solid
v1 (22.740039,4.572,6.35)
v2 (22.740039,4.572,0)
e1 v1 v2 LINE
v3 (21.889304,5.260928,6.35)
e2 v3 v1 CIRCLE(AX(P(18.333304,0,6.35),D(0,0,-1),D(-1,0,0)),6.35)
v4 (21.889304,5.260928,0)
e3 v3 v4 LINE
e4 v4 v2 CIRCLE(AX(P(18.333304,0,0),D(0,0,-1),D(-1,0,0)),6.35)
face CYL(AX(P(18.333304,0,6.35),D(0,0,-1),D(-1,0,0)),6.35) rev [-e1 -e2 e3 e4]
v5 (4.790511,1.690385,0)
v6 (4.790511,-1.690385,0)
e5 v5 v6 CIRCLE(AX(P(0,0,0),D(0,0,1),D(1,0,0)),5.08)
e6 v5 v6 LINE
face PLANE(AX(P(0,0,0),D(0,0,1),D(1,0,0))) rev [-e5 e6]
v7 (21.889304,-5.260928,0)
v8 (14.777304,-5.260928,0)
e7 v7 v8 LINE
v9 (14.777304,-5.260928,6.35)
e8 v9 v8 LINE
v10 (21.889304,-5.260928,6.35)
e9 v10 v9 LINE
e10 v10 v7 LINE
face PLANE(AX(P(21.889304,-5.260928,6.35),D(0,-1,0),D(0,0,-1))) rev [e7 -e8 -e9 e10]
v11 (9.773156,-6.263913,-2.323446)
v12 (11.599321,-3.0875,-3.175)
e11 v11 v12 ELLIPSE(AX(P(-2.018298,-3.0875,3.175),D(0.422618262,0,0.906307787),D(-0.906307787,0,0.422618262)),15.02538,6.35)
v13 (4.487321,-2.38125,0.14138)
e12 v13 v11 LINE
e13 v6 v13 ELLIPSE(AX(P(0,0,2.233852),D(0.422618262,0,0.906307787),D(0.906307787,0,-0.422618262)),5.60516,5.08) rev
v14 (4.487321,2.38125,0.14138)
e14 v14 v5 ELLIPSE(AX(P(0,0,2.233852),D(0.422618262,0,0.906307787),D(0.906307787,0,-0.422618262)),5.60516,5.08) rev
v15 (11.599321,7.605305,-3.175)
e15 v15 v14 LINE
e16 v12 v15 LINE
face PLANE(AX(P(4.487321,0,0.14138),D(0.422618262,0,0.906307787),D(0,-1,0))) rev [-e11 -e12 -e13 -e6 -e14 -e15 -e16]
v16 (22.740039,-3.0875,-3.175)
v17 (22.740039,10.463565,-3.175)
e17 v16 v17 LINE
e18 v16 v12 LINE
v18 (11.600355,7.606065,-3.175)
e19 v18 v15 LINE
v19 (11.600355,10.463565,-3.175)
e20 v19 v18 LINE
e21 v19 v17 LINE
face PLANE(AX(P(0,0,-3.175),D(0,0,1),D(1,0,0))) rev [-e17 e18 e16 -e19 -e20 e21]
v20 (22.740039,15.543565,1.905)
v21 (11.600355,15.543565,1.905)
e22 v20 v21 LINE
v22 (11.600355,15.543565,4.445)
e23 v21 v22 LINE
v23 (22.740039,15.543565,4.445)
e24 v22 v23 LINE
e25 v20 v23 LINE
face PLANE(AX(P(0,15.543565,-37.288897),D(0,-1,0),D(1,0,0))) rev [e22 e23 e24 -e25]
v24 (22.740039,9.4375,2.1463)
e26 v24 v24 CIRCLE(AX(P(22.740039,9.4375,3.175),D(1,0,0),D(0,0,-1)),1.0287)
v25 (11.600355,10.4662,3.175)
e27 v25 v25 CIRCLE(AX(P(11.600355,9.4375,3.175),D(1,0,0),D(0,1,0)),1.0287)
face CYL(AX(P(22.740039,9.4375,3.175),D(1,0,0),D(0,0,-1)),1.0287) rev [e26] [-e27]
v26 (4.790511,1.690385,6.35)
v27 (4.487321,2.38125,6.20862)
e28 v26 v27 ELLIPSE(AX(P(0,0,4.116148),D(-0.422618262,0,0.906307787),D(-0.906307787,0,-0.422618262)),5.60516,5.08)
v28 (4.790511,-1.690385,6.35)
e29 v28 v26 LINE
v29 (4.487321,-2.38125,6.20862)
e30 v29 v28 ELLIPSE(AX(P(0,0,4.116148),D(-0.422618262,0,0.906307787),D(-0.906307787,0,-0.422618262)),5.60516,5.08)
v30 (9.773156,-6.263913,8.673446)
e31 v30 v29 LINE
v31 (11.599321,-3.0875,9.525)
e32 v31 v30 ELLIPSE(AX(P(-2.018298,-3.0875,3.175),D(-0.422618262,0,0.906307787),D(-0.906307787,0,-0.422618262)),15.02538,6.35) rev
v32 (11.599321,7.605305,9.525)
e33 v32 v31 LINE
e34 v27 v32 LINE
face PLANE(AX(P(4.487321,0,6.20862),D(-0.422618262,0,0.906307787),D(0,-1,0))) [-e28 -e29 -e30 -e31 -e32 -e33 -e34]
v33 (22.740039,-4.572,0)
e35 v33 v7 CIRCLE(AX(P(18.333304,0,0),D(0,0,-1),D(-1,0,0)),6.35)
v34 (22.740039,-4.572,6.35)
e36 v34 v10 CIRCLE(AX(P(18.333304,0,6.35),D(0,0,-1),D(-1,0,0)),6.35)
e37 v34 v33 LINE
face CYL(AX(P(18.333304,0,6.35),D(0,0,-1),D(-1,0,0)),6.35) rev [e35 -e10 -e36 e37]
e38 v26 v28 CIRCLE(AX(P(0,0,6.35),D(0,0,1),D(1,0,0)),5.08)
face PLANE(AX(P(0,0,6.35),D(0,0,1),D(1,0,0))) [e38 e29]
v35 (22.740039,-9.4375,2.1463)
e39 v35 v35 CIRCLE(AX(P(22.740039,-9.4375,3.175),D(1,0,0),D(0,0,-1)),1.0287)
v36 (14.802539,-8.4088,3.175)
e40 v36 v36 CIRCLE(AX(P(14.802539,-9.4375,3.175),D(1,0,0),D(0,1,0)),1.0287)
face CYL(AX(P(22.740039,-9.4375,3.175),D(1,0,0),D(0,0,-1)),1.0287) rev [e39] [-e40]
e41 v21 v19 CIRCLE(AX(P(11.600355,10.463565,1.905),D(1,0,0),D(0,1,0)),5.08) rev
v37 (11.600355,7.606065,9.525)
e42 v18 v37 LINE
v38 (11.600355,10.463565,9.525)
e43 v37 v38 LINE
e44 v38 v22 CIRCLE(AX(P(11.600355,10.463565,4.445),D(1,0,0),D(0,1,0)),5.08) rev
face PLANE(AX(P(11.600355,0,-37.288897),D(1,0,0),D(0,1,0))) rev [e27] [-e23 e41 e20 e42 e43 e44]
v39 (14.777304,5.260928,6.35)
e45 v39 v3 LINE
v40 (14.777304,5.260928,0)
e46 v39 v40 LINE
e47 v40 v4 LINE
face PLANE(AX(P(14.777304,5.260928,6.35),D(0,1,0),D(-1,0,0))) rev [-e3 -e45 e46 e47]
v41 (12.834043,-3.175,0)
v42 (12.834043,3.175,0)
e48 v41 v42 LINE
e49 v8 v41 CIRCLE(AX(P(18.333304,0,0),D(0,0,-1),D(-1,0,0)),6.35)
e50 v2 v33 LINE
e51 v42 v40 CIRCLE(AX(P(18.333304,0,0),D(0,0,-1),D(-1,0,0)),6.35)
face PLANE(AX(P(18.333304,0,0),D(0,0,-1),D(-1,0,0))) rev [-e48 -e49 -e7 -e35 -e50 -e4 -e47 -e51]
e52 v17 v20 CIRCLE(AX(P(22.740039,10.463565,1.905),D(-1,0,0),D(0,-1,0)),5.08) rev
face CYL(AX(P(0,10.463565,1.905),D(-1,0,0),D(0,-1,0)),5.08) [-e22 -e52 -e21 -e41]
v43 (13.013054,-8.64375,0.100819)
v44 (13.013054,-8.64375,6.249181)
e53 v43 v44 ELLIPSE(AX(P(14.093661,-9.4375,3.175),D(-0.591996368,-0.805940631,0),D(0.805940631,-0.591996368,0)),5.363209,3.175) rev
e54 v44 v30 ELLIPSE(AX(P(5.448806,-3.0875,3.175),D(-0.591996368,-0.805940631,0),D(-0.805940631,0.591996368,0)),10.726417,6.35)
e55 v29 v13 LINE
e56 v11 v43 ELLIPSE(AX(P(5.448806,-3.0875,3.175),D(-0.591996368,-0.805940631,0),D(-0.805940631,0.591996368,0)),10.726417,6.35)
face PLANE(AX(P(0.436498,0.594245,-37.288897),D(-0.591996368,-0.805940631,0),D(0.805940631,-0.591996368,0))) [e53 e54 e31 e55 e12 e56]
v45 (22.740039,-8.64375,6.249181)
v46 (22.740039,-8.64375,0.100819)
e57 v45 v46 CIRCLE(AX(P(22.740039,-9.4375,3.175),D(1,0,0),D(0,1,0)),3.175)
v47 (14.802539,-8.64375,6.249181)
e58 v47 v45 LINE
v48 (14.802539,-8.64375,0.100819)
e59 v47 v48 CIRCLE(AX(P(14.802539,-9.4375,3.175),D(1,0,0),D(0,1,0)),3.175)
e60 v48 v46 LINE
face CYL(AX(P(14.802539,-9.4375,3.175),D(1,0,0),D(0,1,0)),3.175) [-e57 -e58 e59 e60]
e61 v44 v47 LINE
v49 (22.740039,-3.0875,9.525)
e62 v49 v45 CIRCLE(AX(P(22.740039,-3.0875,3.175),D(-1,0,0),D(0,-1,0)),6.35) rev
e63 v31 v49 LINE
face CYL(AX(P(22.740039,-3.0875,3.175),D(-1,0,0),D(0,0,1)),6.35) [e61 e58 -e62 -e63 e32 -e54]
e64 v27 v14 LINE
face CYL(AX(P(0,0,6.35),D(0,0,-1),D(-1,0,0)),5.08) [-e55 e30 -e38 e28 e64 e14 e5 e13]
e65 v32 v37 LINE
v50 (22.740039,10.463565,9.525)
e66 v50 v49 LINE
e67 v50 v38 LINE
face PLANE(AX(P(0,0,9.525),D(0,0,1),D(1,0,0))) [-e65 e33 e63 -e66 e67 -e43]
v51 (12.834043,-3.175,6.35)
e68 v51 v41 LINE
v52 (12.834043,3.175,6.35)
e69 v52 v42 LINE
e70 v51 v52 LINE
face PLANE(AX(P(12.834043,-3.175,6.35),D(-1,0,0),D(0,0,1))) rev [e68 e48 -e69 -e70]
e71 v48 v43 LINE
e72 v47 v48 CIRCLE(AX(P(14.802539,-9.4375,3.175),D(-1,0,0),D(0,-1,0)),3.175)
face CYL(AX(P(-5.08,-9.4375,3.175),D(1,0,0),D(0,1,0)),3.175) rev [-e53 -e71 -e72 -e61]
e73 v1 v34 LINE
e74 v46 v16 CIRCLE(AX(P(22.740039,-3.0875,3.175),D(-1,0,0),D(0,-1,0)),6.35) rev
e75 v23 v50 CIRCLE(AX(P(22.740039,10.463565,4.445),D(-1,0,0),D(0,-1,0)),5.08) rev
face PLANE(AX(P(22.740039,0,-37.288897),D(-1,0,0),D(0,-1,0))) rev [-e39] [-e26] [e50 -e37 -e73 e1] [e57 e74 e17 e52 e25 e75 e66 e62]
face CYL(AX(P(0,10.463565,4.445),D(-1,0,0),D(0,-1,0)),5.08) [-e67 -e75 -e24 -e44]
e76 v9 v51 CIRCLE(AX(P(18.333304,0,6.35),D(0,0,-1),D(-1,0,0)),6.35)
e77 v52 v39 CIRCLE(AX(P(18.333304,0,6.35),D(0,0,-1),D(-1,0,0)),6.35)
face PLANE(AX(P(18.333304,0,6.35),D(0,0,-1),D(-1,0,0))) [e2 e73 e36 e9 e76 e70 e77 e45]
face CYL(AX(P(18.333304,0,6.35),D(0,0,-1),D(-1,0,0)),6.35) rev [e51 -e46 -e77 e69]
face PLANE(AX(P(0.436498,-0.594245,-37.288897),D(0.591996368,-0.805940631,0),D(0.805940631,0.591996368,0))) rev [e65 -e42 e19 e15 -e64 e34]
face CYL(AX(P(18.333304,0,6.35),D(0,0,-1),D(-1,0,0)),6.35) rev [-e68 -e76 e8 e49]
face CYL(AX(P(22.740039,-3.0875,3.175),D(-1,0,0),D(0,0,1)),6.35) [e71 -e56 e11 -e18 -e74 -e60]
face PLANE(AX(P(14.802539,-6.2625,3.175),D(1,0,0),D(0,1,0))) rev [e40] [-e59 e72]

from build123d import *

# Parameters (mm, degrees)
BOSS_EXTRUDE1_DEPTH   = 6.35
BOSS_EXTRUDE2_START   = 3.175
BOSS_EXTRUDE2_DEPTH   = 12.7
CUT_EXTRUDE1_START    = -3.175
CUT_EXTRUDE1_DEPTH    = 6.35
F_1_CLEARANCE_HOLE1_D = 2.0574
FILLET4_START         = 4.487320853
FILLET4_DEPTH         = 18.252718486
FILLET5_R             = 5.08
CHAMFER3_SIZE         = 7.112
CHAMFER3_SIZE_2       = 3.316380065
BOSS_EXTRUDE3_START   = -7.9375
BOSS_EXTRUDE3_DEPTH   = 7.9375
F_1_CLEARANCE_HOLE2_D = 2.0574
SKETCH14_R            = 3.175
CUT_EXTRUDE2_DEPTH    = 27.974866065


with BuildPart() as part:
    # Sketch1 → Boss-Extrude1 (new body)
    with BuildSketch(Plane.XY):
        with BuildLine():
            Line((4.487320853, -2.38125), (4.487320853, 2.38125))
            ThreePointArc((4.487320853, 2.38125), (-5.08, 0), (4.487320853, -2.38125))
        make_face()
    extrude(amount=BOSS_EXTRUDE1_DEPTH)

    # Sketch2 → Boss-Extrude2 (add)
    with BuildSketch(Plane.XY.offset(6.35).offset(BOSS_EXTRUDE2_START)):
        Polygon((4.487320853, 2.38125), (4.487320853, -2.38125), (11.60035513, -7.606064703), (14.093661168, -9.4375), (22.740039339, -9.4375), (22.740039339, -7.631102389), (22.740039339, 7.631102389), (22.740039339, 15.543564703), (11.60035513, 15.543564703), (11.60035513, 7.606064703), align=None)
    extrude(amount=-BOSS_EXTRUDE2_DEPTH)

    # Sketch10 → Cut-Extrude1 (cut)
    with BuildSketch(Plane(origin=(0, 0, -3.175), x_dir=(-1, 0, 0), z_dir=(0, 0, -1)).offset(CUT_EXTRUDE1_START)):
        with BuildLine():
            Line((-22.740039339, -4.572), (-22.740039339, 4.572))
            ThreePointArc((-22.740039339, 4.572), (-22.329545252, 4.934830916), (-21.88930404, 5.260928055))
            Line((-21.88930404, 5.260928055), (-14.77730404, 5.260928055))
            ThreePointArc((-14.77730404, 5.260928055), (-13.687099855, 4.328427737), (-12.834042726, 3.175))
            Line((-12.834042726, 3.175), (-12.834042726, -3.175))
            ThreePointArc((-12.834042726, -3.175), (-13.687099855, -4.328427737), (-14.77730404, -5.260928055))
            Line((-14.77730404, -5.260928055), (-21.88930404, -5.260928055))
            ThreePointArc((-21.88930404, -5.260928055), (-22.329545252, -4.934830916), (-22.740039339, -4.572))
        make_face()
    extrude(amount=-CUT_EXTRUDE1_DEPTH, mode=Mode.SUBTRACT)

    # #1 Clearance Hole1 (through all)
    with Locations(Plane(origin=(22.740039339, 0, 0), x_dir=(0, 0, -1), z_dir=(1, 0, 0))):
        with Locations((-3.175, 9.4375)):
            Hole(F_1_CLEARANCE_HOLE1_D / 2)

    # Fillet4: read off the stored shape, not the designer's step
    # Fillet4 outline → Fillet4 (cut)
    with BuildSketch(Plane.YZ.offset(FILLET4_START)):
        with BuildLine():
            Line((-9.4375, -3.175), (-3.0875, -3.175))
            ThreePointArc((-3.0875, -3.175), (-7.577628061, -1.315128061), (-9.4375, 3.175))
            Line((-9.4375, 3.175), (-9.4375, -3.175))
        make_face()
        with BuildLine():
            Line((-9.4375, 9.525), (-9.4375, 3.175))
            ThreePointArc((-9.4375, 3.175), (-7.577628061, 7.665128061), (-3.0875, 9.525))
            Line((-3.0875, 9.525), (-9.4375, 9.525))
        make_face()
    extrude(amount=FILLET4_DEPTH, mode=Mode.SUBTRACT)

    # Fillet5
    fillet5_edges = [part.edges().sort_by_distance(p)[0] for p in [
        (17.170197235, 15.543564703, -3.175),
        (17.170197235, 15.543564703, 9.525),
    ]]
    fillet(fillet5_edges, radius=FILLET5_R)

    # Chamfer3
    # the kernel refuses this chamfer: 7.112, 3.316380065 mm, written as the material it takes off along each edge
    with BuildSketch(Plane(origin=(4.487320853, 20.808267553, -3.175), x_dir=(1, 0, 0), z_dir=(0, -1, 0))) as chamfer3_piece_1_section:
        Polygon((CHAMFER3_SIZE, 0), (0, CHAMFER3_SIZE_2), (0, 0), align=None)
    chamfer3_piece_1 = extrude(amount=41.616535106, mode=Mode.PRIVATE)
    chamfer3_piece_1 = chamfer3_piece_1 - Plane(origin=(0, 0, -3.175), x_dir=(0.8833308765689106, 0.46875000000000017, 0), z_dir=(0, 0, -1)) * Cylinder(5.08, 112, mode=Mode.PRIVATE)
    add(chamfer3_piece_1, mode=Mode.SUBTRACT)
    with BuildSketch(Plane(origin=(4.487320853, 20.808267553, -3.175), x_dir=(1, 0, 0), z_dir=(0, -1, 0))) as chamfer3_piece_2_section:
        Polygon((CHAMFER3_SIZE, 0), (0, CHAMFER3_SIZE_2), (0, 0), align=None)
    chamfer3_piece_2 = extrude(amount=41.616535106, mode=Mode.PRIVATE)
    chamfer3_piece_2 = split(chamfer3_piece_2, bisect_by=Plane(origin=(4.487320853, 20.808267553, 0), z_dir=(0, 0, -1)), keep=Keep.TOP, mode=Mode.PRIVATE)
    add(chamfer3_piece_2, mode=Mode.SUBTRACT)
    with BuildSketch(Plane(origin=(4.487320853, 20.808267553, 9.525), x_dir=(1, 0, 0), z_dir=(0, -1, 0))) as chamfer3_piece_3_section:
        Polygon((CHAMFER3_SIZE, 0), (0, -CHAMFER3_SIZE_2), (0, 0), align=None)
    chamfer3_piece_3 = extrude(amount=41.616535106, mode=Mode.PRIVATE)
    chamfer3_piece_3 = chamfer3_piece_3 - Plane(origin=(0, 0, 9.525), x_dir=(0.8833308765689106, 0.46875000000000017, 0), z_dir=(0, 0, -1)) * Cylinder(5.08, 112, mode=Mode.PRIVATE)
    add(chamfer3_piece_3, mode=Mode.SUBTRACT)
    with BuildSketch(Plane(origin=(4.487320853, 20.808267553, 9.525), x_dir=(1, 0, 0), z_dir=(0, -1, 0))) as chamfer3_piece_4_section:
        Polygon((CHAMFER3_SIZE, 0), (0, -CHAMFER3_SIZE_2), (0, 0), align=None)
    chamfer3_piece_4 = extrude(amount=41.616535106, mode=Mode.PRIVATE)
    chamfer3_piece_4 = split(chamfer3_piece_4, bisect_by=Plane(origin=(4.487320853, 20.808267553, 6.35), z_dir=(0, 0, 1)), keep=Keep.TOP, mode=Mode.PRIVATE)
    add(chamfer3_piece_4, mode=Mode.SUBTRACT)

    # Sketch11 → Boss-Extrude3 (add)
    with BuildSketch(Plane(origin=(22.740039339, 0, 0), x_dir=(0, 0, -1), z_dir=(1, 0, 0)).offset(BOSS_EXTRUDE3_START)):
        with BuildLine():
            ThreePointArc((-6.249180531, -8.64375), (-3.175, -12.6125), (-0.100819469, -8.64375))
            ThreePointArc((-0.100819469, -8.64375), (-3.175, -9.4375), (-6.249180531, -8.64375))
        make_face()
    extrude(amount=BOSS_EXTRUDE3_DEPTH)

    # #1 Clearance Hole2 (through all)
    with Locations(Plane(origin=(22.740039339, 0, 0), x_dir=(0, 0, -1), z_dir=(1, 0, 0))):
        with Locations((-3.175, -9.4375)):
            Hole(F_1_CLEARANCE_HOLE2_D / 2)

    # Sketch14 → Cut-Extrude2 (cut, through all)
    with BuildSketch(Plane.ZY.offset(-14.802539339)):
        with Locations((3.175, -9.4375)):
            Circle(SKETCH14_R)
    extrude(amount=CUT_EXTRUDE2_DEPTH, mode=Mode.SUBTRACT)


solid = part.part
